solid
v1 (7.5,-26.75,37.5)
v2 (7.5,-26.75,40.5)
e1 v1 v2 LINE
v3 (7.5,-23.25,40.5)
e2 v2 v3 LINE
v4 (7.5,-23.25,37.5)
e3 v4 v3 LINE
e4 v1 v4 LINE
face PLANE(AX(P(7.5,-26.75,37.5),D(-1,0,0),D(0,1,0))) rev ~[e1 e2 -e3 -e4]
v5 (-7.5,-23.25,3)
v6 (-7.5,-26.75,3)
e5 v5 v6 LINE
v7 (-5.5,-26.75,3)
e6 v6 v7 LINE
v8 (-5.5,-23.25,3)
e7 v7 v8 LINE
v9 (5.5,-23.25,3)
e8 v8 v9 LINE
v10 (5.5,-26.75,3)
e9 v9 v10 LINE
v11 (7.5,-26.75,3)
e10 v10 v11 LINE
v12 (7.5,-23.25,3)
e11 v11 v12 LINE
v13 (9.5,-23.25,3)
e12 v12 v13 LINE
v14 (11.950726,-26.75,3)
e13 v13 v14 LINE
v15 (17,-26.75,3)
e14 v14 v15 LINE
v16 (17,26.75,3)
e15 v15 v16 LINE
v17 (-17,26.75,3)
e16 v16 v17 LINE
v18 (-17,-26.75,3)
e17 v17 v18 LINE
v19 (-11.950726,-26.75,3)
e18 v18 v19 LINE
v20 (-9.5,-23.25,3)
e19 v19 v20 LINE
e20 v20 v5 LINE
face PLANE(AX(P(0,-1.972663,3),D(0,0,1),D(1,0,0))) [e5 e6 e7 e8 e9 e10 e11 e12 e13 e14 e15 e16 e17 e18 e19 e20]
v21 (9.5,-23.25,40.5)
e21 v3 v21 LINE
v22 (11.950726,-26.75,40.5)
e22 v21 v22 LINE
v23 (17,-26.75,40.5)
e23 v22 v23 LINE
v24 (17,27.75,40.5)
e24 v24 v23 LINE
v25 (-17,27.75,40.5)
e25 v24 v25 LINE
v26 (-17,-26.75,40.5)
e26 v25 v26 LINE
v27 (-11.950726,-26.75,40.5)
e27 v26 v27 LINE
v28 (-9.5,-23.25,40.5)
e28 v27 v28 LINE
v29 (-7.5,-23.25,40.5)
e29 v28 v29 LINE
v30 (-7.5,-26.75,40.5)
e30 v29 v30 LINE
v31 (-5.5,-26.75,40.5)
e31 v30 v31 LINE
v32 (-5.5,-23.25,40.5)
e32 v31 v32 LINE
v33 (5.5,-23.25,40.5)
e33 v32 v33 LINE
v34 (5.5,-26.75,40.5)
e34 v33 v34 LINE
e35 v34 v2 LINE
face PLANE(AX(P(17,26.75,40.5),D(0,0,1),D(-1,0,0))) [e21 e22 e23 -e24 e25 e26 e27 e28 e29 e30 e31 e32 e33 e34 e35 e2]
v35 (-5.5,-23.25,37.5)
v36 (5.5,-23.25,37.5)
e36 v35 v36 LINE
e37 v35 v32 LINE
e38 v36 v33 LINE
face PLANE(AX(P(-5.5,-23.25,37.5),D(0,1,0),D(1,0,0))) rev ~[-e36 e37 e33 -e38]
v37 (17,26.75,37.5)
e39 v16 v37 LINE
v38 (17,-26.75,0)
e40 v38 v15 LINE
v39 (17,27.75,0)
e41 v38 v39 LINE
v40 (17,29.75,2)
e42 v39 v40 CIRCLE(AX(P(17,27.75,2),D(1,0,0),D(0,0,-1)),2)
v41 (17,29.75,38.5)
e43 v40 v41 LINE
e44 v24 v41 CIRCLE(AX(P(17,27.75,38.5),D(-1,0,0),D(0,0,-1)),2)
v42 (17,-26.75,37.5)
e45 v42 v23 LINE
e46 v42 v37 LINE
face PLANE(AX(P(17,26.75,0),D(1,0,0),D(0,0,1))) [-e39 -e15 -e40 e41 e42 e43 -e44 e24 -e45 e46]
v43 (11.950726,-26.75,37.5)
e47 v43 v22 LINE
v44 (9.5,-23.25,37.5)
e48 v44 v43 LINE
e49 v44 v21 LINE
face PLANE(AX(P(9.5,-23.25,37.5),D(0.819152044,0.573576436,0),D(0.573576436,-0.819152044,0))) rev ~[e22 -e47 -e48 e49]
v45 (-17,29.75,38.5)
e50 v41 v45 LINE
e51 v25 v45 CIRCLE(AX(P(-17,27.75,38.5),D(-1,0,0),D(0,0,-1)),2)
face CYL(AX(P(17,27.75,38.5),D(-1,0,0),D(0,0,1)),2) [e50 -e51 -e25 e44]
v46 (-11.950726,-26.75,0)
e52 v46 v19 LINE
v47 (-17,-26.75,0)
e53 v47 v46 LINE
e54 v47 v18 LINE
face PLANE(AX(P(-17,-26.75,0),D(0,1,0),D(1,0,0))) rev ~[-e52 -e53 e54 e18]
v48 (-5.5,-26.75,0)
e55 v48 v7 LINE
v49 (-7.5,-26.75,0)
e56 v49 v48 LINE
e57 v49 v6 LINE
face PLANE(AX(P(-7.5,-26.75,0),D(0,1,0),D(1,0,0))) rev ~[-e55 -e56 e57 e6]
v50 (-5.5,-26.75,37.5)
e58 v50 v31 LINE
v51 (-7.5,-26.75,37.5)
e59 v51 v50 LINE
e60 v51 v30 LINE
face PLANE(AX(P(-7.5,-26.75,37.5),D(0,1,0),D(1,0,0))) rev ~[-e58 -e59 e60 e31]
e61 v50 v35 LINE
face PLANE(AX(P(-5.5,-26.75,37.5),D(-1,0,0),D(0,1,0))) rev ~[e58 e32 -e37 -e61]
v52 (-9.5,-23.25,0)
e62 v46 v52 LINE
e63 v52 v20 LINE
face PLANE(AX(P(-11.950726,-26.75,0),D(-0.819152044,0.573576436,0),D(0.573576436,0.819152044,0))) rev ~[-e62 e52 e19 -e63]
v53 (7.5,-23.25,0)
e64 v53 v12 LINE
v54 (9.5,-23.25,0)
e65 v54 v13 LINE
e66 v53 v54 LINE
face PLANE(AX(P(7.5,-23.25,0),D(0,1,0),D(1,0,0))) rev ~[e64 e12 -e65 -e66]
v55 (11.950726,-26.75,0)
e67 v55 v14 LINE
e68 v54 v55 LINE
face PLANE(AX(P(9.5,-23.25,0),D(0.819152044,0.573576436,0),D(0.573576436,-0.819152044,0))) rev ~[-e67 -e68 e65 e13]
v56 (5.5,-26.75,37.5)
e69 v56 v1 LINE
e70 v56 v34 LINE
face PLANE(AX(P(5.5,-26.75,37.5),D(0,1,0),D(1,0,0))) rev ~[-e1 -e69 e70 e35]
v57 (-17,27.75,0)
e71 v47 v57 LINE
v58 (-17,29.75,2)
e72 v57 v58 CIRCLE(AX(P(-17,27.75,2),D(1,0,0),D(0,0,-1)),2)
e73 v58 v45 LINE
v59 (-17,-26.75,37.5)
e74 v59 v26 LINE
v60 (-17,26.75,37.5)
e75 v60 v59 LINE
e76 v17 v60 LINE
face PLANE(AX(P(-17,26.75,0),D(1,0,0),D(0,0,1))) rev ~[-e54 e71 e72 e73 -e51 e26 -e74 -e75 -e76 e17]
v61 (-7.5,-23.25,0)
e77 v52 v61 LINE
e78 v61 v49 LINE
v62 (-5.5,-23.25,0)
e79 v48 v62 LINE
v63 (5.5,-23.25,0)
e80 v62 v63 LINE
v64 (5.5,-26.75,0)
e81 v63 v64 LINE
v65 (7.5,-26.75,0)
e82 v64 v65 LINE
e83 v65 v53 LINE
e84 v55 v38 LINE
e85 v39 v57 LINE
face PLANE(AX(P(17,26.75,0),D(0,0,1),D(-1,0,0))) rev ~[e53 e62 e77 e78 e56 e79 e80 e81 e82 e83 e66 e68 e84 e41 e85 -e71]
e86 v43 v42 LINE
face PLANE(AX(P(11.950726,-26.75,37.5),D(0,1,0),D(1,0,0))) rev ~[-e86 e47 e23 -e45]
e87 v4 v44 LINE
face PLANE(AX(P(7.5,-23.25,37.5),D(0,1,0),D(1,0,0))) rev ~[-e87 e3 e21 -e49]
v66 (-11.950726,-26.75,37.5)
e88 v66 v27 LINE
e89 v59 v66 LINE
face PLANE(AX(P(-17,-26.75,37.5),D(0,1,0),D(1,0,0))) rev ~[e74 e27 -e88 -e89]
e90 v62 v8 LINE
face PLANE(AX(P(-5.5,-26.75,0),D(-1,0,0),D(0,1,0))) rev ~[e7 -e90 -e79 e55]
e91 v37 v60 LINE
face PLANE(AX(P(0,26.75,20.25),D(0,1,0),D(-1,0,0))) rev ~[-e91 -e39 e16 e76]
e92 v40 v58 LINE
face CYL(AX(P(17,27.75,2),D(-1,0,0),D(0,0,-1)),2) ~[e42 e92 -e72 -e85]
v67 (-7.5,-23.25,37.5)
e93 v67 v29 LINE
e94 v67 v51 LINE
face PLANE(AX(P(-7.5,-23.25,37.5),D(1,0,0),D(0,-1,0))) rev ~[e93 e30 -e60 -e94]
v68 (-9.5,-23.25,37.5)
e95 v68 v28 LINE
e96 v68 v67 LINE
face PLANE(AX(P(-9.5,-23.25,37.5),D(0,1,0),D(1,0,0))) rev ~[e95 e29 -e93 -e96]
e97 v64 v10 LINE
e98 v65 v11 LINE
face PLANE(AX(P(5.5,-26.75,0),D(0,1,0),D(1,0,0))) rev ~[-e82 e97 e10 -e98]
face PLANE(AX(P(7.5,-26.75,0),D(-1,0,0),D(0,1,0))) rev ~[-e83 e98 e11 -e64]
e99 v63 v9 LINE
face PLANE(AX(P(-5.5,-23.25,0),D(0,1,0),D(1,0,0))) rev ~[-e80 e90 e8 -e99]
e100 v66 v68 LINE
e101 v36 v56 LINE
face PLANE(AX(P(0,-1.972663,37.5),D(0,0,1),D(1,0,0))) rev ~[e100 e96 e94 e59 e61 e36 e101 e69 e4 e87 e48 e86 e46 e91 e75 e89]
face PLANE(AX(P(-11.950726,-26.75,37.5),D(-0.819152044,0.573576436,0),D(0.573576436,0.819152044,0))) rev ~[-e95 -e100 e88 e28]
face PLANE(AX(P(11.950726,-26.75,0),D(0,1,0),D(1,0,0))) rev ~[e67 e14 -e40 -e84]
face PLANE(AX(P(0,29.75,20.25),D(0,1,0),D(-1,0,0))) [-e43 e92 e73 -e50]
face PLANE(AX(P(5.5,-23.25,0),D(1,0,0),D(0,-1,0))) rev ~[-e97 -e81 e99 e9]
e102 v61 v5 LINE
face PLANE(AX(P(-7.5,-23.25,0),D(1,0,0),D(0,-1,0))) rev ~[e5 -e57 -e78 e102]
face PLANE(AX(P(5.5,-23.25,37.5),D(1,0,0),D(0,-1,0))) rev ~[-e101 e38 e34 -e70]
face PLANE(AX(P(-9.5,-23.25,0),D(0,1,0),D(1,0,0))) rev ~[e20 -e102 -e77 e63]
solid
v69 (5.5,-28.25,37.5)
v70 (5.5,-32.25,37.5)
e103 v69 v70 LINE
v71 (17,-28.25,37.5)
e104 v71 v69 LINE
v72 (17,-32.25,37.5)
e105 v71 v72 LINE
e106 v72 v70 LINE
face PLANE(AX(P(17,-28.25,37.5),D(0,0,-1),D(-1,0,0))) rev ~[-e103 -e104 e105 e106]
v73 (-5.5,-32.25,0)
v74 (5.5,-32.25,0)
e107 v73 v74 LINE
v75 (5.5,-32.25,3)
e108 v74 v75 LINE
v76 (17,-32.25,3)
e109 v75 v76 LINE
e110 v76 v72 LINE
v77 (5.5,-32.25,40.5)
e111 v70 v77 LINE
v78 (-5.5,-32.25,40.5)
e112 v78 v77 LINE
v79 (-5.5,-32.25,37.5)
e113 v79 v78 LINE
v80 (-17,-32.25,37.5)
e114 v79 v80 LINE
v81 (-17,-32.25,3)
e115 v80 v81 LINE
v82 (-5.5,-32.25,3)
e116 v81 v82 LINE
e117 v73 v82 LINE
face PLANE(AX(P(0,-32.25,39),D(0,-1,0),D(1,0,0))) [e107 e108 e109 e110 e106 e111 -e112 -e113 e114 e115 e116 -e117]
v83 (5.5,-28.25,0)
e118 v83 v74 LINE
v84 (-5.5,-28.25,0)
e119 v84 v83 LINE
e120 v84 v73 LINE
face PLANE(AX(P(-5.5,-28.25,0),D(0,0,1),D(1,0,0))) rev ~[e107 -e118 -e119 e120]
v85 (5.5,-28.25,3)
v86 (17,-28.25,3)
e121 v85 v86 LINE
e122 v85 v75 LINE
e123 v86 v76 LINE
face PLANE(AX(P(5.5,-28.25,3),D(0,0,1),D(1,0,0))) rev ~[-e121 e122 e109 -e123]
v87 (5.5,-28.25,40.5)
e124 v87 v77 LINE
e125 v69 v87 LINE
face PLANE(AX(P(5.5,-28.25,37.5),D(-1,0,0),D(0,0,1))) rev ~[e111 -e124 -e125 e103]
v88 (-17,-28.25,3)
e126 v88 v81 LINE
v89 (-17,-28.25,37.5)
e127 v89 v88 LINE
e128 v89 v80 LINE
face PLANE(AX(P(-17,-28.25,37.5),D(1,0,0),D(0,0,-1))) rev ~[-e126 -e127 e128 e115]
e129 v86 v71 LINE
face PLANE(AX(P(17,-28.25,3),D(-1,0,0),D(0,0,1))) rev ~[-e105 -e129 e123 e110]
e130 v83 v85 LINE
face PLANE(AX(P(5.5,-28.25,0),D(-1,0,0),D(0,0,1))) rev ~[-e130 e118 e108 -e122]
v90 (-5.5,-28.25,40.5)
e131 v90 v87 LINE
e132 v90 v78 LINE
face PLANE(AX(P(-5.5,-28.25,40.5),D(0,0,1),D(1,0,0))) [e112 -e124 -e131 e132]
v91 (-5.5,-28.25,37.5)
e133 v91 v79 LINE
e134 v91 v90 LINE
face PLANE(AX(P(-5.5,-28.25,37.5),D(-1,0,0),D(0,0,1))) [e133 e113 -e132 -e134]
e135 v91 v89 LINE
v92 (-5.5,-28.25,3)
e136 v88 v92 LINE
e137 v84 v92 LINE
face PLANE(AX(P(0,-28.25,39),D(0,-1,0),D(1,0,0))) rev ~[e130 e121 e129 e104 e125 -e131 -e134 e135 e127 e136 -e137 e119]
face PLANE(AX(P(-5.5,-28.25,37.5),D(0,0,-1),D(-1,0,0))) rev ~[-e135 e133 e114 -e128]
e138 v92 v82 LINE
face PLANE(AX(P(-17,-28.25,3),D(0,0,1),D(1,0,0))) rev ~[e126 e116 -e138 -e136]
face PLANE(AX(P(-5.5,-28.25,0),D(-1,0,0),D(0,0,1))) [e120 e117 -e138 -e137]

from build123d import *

# Parameters (mm, degrees)
F5_DEPTH  = 3
F7_W      = 34
F7_H      = 40.5
F8_DEPTH  = 3
F9_R      = 2
F11_W     = 11
F11_H     = 3
F12_DEPTH = 4


with BuildPart() as f5:
    # F2 (on Top) → F5 (new body)
    with BuildSketch(Plane.XY):
        Polygon((-17, 26.75), (-17, -26.75), (-11.9507263837, -26.75), (-9.5, -23.25), (-7.5, -23.25), (-7.5, -26.75), (-5.5, -26.75), (-5.5, -23.25), (5.5, -23.25), (5.5, -26.75), (7.5, -26.75), (7.5, -23.25), (9.5, -23.25), (11.9507263837, -26.75), (17, -26.75), (17, 26.75), align=None)
    extrude(amount=F5_DEPTH)



with BuildPart() as f5b:
    # F4 (on offset) → F5, piece 2 (new body)
    with BuildSketch(Plane.XY.offset(37.5)):
        Polygon((5.5, -26.75), (7.5, -26.75), (7.5, -23.25), (9.5, -23.25), (11.9507263837, -26.75), (17, -26.75), (17, 26.75), (-17, 26.75), (-17, -26.75), (-11.9507263837, -26.75), (-9.5, -23.25), (-7.5, -23.25), (-7.5, -26.75), (-5.5, -26.75), (-5.5, -23.25), (5.5, -23.25), align=None)
    extrude(amount=F5_DEPTH)


with BuildPart() as f5_1:
    add(f5.part)

    add(f5b.part)  # F8 merges F5b
    # F7 (on offset) → F8 (join)
    with BuildSketch(Plane(origin=(0, 26.75, 0), x_dir=(-1, 0, 0), z_dir=(0, 1, 0))):
        with Locations((0, 20.25)):
            Rectangle(F7_W, F7_H)
    extrude(amount=F8_DEPTH)

    # F9
    f9_edges = [f5_1.edges().sort_by_distance(p)[0] for p in [
        (0, 29.75, 40.5),
        (0, 29.75, 0),
    ]]
    fillet(f9_edges, radius=F9_R)


with BuildPart() as f12:
    # F11 (on offset) → F12 (new body)
    with BuildSketch(Plane.XZ.offset(28.25)):
        with Locations((0, 39)):
            Rectangle(F11_W, F11_H)
        Polygon((5.5, 37.5), (-5.5, 37.5), (-17, 37.5), (-17, 3), (-5.5, 3), (5.5, 3), (17, 3), (17, 37.5), align=None)
        with Locations((0, 1.5)):
            Rectangle(F11_W, F11_H)
    extrude(amount=F12_DEPTH)


solid = Compound([f5_1.part, f12.part])
